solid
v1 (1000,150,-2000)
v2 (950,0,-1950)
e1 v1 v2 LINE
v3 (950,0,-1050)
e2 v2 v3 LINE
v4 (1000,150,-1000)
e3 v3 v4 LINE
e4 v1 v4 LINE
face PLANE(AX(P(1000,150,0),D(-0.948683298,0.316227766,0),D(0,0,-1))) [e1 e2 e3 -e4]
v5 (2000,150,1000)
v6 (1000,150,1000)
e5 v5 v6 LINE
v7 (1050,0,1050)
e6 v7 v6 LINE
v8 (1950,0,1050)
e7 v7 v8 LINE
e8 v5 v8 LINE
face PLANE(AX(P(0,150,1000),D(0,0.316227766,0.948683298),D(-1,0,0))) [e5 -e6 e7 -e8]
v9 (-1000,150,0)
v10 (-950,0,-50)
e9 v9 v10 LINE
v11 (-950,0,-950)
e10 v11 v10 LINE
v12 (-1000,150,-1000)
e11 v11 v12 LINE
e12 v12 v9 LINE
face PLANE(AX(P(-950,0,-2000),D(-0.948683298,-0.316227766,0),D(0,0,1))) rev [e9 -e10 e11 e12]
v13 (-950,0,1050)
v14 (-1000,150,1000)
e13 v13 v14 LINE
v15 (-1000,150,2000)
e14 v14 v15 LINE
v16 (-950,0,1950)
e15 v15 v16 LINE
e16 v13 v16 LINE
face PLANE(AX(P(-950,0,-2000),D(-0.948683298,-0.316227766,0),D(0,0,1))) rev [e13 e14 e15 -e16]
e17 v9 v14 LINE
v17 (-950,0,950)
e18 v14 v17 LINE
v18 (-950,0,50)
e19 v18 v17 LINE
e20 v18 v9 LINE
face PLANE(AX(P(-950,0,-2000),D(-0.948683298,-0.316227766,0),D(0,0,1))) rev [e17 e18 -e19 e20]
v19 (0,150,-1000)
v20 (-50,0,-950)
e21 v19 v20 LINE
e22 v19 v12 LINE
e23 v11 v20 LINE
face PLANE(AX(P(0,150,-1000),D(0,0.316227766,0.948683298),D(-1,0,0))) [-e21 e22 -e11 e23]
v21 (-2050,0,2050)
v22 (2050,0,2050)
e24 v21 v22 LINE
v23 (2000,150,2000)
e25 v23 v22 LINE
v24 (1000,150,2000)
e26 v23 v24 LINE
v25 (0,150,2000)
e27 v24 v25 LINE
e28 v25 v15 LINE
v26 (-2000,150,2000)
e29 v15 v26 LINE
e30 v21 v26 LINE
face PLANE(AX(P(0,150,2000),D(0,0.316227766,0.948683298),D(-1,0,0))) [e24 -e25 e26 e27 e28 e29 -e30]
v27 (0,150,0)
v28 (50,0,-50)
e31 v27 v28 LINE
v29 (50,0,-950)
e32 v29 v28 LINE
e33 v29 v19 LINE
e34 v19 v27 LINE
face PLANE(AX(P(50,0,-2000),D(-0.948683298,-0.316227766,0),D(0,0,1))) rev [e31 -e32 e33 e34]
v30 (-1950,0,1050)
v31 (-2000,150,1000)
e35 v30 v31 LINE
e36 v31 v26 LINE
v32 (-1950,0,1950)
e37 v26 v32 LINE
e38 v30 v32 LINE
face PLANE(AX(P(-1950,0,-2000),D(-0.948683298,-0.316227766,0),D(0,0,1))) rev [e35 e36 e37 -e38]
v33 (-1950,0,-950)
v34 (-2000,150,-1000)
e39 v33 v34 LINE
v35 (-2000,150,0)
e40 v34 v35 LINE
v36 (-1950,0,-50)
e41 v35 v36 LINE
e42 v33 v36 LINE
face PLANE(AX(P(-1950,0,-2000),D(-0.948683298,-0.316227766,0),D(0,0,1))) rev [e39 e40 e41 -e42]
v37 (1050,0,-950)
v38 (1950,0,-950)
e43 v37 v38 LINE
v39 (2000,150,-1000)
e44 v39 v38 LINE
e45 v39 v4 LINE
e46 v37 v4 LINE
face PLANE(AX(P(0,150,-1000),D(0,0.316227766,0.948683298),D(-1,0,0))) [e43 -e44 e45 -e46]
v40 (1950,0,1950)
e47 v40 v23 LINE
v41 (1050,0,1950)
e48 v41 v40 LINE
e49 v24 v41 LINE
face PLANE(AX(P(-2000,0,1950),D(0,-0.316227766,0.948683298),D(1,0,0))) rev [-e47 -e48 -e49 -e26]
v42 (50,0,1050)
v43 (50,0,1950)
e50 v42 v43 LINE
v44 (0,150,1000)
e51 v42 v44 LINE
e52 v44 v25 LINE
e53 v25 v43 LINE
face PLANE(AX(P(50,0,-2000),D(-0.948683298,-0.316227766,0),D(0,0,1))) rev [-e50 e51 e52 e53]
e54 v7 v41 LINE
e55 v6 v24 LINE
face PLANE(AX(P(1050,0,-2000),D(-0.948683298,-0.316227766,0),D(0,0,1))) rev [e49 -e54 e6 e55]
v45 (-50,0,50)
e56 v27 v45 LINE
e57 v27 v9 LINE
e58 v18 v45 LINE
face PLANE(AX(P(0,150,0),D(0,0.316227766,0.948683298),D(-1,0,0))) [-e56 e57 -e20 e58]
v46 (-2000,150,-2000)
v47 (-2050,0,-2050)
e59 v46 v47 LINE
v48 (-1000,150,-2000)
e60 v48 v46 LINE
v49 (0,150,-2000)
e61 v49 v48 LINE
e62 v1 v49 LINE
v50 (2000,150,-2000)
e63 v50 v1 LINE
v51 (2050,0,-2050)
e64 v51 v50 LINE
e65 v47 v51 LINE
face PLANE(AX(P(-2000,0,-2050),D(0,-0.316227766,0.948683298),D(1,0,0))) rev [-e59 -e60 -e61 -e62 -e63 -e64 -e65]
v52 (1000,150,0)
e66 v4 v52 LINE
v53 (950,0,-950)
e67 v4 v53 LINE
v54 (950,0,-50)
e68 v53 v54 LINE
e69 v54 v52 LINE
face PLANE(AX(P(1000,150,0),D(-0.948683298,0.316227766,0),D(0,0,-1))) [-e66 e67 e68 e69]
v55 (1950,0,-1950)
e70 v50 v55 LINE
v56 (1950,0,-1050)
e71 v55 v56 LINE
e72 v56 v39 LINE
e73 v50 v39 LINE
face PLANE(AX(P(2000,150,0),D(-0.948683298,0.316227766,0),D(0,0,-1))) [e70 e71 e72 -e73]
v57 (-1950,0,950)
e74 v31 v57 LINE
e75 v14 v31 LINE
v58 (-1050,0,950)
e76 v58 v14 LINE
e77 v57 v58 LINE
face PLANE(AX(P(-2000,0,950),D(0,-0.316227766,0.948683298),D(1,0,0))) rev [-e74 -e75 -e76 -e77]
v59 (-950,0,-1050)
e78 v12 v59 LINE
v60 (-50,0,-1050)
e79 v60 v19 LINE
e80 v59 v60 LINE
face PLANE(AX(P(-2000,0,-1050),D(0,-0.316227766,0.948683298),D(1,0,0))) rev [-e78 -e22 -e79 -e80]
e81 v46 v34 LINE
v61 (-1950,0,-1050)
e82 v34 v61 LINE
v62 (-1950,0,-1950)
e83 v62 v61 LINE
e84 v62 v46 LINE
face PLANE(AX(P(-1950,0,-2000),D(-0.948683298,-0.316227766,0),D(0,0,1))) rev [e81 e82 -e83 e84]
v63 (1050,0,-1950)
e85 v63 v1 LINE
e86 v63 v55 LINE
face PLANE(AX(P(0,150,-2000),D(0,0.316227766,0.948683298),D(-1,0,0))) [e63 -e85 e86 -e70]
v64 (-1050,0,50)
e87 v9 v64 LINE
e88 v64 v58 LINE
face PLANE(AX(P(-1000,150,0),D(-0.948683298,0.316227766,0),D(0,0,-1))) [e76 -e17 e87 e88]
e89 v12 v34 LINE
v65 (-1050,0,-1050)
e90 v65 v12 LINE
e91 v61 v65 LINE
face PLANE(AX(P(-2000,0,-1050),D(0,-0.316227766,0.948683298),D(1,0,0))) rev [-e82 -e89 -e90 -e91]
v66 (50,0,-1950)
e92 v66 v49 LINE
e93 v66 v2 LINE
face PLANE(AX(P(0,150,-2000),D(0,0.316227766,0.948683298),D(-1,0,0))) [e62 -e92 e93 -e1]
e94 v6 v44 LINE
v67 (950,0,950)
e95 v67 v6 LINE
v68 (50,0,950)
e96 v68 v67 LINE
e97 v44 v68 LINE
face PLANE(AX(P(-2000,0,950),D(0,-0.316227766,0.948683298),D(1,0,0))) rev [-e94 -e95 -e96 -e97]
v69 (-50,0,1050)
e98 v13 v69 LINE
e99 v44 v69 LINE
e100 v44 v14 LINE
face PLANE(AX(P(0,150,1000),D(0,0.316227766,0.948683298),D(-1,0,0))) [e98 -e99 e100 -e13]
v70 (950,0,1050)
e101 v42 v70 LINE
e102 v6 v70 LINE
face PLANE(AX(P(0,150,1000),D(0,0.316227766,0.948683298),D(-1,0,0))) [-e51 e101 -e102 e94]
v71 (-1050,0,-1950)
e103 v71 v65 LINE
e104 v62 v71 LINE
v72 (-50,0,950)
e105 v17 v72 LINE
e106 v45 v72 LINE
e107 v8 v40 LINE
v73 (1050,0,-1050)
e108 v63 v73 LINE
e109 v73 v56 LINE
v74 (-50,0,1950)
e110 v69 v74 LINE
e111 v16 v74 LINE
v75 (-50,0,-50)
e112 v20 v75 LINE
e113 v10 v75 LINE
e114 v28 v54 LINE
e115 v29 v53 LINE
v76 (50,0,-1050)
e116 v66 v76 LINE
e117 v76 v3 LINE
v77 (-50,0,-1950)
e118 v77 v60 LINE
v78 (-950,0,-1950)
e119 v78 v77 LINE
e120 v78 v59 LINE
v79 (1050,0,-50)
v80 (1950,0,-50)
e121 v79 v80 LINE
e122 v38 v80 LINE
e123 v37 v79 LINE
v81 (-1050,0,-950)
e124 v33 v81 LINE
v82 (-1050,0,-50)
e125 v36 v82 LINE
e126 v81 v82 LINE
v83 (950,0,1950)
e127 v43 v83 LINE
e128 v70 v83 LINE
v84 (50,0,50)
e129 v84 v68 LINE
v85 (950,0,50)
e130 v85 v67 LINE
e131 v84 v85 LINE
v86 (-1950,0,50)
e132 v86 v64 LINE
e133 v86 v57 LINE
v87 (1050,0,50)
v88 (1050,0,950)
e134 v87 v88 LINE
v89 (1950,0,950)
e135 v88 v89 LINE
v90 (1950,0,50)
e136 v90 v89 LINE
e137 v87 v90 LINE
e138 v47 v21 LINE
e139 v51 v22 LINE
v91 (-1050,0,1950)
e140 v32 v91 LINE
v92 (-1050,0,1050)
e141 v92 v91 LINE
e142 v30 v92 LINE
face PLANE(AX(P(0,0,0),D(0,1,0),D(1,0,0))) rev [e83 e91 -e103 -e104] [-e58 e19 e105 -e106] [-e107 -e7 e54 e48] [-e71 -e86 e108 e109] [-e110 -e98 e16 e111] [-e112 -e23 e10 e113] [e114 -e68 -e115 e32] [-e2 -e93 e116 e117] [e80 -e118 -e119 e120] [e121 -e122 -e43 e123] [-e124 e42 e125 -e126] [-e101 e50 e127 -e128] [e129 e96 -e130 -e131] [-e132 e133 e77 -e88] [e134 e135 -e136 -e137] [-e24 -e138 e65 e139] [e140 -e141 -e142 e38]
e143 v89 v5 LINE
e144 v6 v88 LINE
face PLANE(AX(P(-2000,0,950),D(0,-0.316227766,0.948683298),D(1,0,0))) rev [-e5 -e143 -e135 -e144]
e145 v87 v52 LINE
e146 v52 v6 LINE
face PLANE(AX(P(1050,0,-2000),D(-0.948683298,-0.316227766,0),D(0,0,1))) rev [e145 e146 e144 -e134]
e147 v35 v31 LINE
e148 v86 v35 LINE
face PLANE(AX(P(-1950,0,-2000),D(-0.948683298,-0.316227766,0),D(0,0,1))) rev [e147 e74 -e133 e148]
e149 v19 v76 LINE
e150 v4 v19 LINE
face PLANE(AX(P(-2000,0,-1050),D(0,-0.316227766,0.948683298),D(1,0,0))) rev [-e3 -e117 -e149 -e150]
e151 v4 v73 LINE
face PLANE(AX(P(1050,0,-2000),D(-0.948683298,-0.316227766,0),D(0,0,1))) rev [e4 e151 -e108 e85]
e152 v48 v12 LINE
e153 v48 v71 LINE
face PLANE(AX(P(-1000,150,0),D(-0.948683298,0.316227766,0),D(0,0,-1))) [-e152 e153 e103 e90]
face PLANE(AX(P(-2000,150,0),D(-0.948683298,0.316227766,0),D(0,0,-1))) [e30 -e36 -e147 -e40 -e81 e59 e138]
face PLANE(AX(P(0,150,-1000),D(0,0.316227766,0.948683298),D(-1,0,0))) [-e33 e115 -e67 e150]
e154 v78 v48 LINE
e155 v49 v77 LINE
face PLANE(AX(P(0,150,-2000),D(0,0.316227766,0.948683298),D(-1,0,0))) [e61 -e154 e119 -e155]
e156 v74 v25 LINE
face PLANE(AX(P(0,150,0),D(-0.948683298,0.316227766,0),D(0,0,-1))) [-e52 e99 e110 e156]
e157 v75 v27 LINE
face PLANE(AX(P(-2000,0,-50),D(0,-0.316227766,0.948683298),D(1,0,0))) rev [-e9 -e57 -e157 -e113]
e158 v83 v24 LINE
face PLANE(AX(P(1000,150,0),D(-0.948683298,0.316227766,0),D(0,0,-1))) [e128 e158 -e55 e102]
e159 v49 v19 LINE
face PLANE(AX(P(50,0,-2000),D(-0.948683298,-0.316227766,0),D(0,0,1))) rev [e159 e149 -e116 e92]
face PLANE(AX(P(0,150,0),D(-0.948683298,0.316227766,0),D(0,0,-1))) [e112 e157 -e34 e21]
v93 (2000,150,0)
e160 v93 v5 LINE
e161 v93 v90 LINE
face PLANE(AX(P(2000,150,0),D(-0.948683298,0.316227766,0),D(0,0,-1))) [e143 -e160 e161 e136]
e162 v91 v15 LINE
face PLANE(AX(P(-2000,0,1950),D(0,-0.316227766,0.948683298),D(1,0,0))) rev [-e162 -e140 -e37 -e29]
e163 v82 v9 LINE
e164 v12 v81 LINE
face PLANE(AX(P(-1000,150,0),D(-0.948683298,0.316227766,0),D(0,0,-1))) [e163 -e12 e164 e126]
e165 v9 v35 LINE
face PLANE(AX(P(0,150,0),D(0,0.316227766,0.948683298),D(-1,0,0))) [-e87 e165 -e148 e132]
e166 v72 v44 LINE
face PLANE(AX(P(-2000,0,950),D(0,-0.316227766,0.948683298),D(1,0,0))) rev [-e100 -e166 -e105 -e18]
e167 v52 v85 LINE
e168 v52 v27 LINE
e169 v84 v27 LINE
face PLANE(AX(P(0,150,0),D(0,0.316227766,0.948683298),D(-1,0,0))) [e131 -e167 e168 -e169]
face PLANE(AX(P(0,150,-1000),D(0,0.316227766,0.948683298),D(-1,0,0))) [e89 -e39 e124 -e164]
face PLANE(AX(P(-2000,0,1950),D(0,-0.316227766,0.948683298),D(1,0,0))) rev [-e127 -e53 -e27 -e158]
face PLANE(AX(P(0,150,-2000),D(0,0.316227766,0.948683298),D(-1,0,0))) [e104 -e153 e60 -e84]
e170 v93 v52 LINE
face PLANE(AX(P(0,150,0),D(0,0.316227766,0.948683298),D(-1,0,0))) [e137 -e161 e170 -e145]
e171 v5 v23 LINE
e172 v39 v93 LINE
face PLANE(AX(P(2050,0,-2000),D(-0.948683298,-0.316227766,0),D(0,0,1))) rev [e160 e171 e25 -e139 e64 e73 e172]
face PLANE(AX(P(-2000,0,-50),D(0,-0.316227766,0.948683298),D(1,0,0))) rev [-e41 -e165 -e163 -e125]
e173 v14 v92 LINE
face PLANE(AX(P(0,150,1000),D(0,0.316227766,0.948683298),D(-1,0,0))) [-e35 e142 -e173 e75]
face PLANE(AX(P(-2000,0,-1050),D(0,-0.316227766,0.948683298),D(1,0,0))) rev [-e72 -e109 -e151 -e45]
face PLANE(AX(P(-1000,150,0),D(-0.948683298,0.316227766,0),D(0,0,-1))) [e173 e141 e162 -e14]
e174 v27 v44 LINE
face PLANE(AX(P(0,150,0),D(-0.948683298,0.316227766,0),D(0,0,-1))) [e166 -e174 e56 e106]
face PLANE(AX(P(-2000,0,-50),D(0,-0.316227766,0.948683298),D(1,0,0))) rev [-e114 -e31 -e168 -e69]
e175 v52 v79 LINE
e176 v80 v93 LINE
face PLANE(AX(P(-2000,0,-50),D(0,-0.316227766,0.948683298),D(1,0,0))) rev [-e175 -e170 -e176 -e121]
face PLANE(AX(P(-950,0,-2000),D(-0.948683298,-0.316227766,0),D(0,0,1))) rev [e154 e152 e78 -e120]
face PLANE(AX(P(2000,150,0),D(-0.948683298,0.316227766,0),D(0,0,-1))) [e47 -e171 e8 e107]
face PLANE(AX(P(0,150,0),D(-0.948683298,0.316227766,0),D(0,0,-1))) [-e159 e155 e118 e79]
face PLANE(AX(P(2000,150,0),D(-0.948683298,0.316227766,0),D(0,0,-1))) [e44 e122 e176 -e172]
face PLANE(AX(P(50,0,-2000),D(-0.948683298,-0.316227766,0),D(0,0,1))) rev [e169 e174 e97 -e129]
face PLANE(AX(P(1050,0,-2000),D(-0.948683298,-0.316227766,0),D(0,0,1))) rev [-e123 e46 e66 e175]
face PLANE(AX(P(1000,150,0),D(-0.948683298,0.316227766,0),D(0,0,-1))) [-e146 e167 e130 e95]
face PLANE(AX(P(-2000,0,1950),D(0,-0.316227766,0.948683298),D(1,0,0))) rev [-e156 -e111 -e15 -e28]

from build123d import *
from OCP.BRepFilletAPI import BRepFilletAPI_MakeChamfer

# Parameters (mm, degrees)
SKETCH_1_W       = 4000
SKETCH_1_H       = 100
SKETCH_1_W_2     = 4100
SKETCH_1_H_2     = 4100
SKETCH_1_W_3     = 3900
SKETCH_1_H_3     = 3900
SKETCH_1_W_4     = 100
SKETCH_1_H_4     = 4000
EXTRUDE_1_DEPTH  = 150
CHAMFER_1_SIZE   = 150
CHAMFER_1_SIZE_2 = 50
CHAMFER_2_SIZE   = 50
CHAMFER_2_SIZE_2 = 150
CHAMFER_3_SIZE   = 150
CHAMFER_3_SIZE_2 = 50
CHAMFER_4_SIZE   = 150
CHAMFER_4_SIZE_2 = 50


with BuildPart() as part:
    # 草图1 → 拉伸-薄壁1 (new body)
    # profile 1 of 7: a face of its own
    with BuildSketch(Plane(origin=(0, 0, 0), x_dir=(1, 0, 0), z_dir=(0, 1, 0))):
        Rectangle(SKETCH_1_W, SKETCH_1_H)
    # profile 2 of 7: a face of its own
    with BuildSketch(Plane(origin=(0, 0, 0), x_dir=(1, 0, 0), z_dir=(0, 1, 0))):
        Rectangle(SKETCH_1_W_2, SKETCH_1_H_2)
        Rectangle(SKETCH_1_W_3, SKETCH_1_H_3, mode=Mode.SUBTRACT)
    # profile 3 of 7: a face of its own
    with BuildSketch(Plane(origin=(0, 0, 0), x_dir=(1, 0, 0), z_dir=(0, 1, 0))):
        Rectangle(SKETCH_1_W_4, SKETCH_1_H_4)
    # profile 4 of 7: a face of its own
    with BuildSketch(Plane(origin=(0, 0, 0), x_dir=(1, 0, 0), z_dir=(0, 1, 0))):
        with Locations((0, 1000)):
            Rectangle(SKETCH_1_W, SKETCH_1_H)
    # profile 5 of 7: a face of its own
    with BuildSketch(Plane(origin=(0, 0, 0), x_dir=(1, 0, 0), z_dir=(0, 1, 0))):
        with Locations((0, -1000)):
            Rectangle(SKETCH_1_W, SKETCH_1_H)
    # profile 6 of 7: a face of its own
    with BuildSketch(Plane(origin=(0, 0, 0), x_dir=(1, 0, 0), z_dir=(0, 1, 0))):
        with Locations((-1000, 0)):
            Rectangle(SKETCH_1_W_4, SKETCH_1_H_4)
    # profile 7 of 7: a face of its own
    with BuildSketch(Plane(origin=(0, 0, 0), x_dir=(1, 0, 0), z_dir=(0, 1, 0))):
        with Locations((1000, 0)):
            Rectangle(SKETCH_1_W_4, SKETCH_1_H_4)
    extrude(amount=EXTRUDE_1_DEPTH)

    # 倒角1
    chamfer_1_edges_1 = [part.edges().sort_by_distance(p)[0] for p in [
        (1950, 150, -1500),
    ]]
    chamfer_1_side_1 = [part.faces().sort_by_distance(p)[0] for p in [
        (1950, 149, -1500),
    ]]
    chamfer_1_edges_2 = [part.edges().sort_by_distance(p)[0] for p in [
        (1950, 150, -500),
    ]]
    chamfer_1_side_2 = [part.faces().sort_by_distance(p)[0] for p in [
        (1950, 149, -500),
    ]]
    chamfer_1_edges_3 = [part.edges().sort_by_distance(p)[0] for p in [
        (1950, 150, 500),
    ]]
    chamfer_1_side_3 = [part.faces().sort_by_distance(p)[0] for p in [
        (1950, 149, 500),
    ]]
    chamfer_1_edges_4 = [part.edges().sort_by_distance(p)[0] for p in [
        (1950, 150, 1500),
    ]]
    chamfer_1_side_4 = [part.faces().sort_by_distance(p)[0] for p in [
        (1950, 149, 1500),
    ]]
    chamfer_1_edges_5 = [part.edges().sort_by_distance(p)[0] for p in [
        (950, 150, 1500),
    ]]
    chamfer_1_side_5 = [part.faces().sort_by_distance(p)[0] for p in [
        (951, 150, 1500),
    ]]
    chamfer_1_edges_6 = [part.edges().sort_by_distance(p)[0] for p in [
        (950, 150, 500),
    ]]
    chamfer_1_side_6 = [part.faces().sort_by_distance(p)[0] for p in [
        (951, 150, 500),
    ]]
    chamfer_1_edges_7 = [part.edges().sort_by_distance(p)[0] for p in [
        (950, 150, -500),
    ]]
    chamfer_1_side_7 = [part.faces().sort_by_distance(p)[0] for p in [
        (951, 150, -500),
    ]]
    chamfer_1_edges_8 = [part.edges().sort_by_distance(p)[0] for p in [
        (950, 150, -1500),
    ]]
    chamfer_1_side_8 = [part.faces().sort_by_distance(p)[0] for p in [
        (951, 150, -1500),
    ]]
    chamfer_1_edges_9 = [part.edges().sort_by_distance(p)[0] for p in [
        (-50, 150, -1500),
    ]]
    chamfer_1_side_9 = [part.faces().sort_by_distance(p)[0] for p in [
        (-50, 149, -1500),
    ]]
    chamfer_1_edges_10 = [part.edges().sort_by_distance(p)[0] for p in [
        (-50, 150, -500),
    ]]
    chamfer_1_side_10 = [part.faces().sort_by_distance(p)[0] for p in [
        (-50, 149, -500),
    ]]
    chamfer_1_edges_11 = [part.edges().sort_by_distance(p)[0] for p in [
        (-50, 150, 500),
    ]]
    chamfer_1_side_11 = [part.faces().sort_by_distance(p)[0] for p in [
        (-50, 149, 500),
    ]]
    chamfer_1_edges_12 = [part.edges().sort_by_distance(p)[0] for p in [
        (-50, 150, 1500),
    ]]
    chamfer_1_side_12 = [part.faces().sort_by_distance(p)[0] for p in [
        (-50, 149, 1500),
    ]]
    chamfer_1_edges_13 = [part.edges().sort_by_distance(p)[0] for p in [
        (-1050, 150, 1500),
    ]]
    chamfer_1_side_13 = [part.faces().sort_by_distance(p)[0] for p in [
        (-1050, 149, 1500),
    ]]
    chamfer_1_edges_14 = [part.edges().sort_by_distance(p)[0] for p in [
        (-1050, 150, 500),
    ]]
    chamfer_1_side_14 = [part.faces().sort_by_distance(p)[0] for p in [
        (-1050, 149, 500),
    ]]
    chamfer_1_edges_15 = [part.edges().sort_by_distance(p)[0] for p in [
        (-1050, 150, -500),
    ]]
    chamfer_1_side_15 = [part.faces().sort_by_distance(p)[0] for p in [
        (-1050, 149, -500),
    ]]
    chamfer_1_edges_16 = [part.edges().sort_by_distance(p)[0] for p in [
        (-1050, 150, -1500),
    ]]
    chamfer_1_side_16 = [part.faces().sort_by_distance(p)[0] for p in [
        (-1050, 149, -1500),
    ]]
    chamfer_1_edges_17 = [part.edges().sort_by_distance(p)[0] for p in [
        (-2050, 150, 0),
    ]]
    chamfer_1_side_17 = [part.faces().sort_by_distance(p)[0] for p in [
        (-2050, 149, 0),
    ]]
    chamfer_1 = BRepFilletAPI_MakeChamfer(part.part.solid().wrapped)
    for e in chamfer_1_edges_1:
        chamfer_1.Add(CHAMFER_1_SIZE - 0.0001, CHAMFER_1_SIZE_2 - 0.0001, e.wrapped, chamfer_1_side_1[0].wrapped)
    for e in chamfer_1_edges_2:
        chamfer_1.Add(CHAMFER_1_SIZE - 0.0001, CHAMFER_1_SIZE_2 - 0.0001, e.wrapped, chamfer_1_side_2[0].wrapped)
    for e in chamfer_1_edges_3:
        chamfer_1.Add(CHAMFER_1_SIZE - 0.0001, CHAMFER_1_SIZE_2 - 0.0001, e.wrapped, chamfer_1_side_3[0].wrapped)
    for e in chamfer_1_edges_4:
        chamfer_1.Add(CHAMFER_1_SIZE - 0.0001, CHAMFER_1_SIZE_2 - 0.0001, e.wrapped, chamfer_1_side_4[0].wrapped)
    for e in chamfer_1_edges_5:
        chamfer_1.Add(CHAMFER_1_SIZE_2 - 0.0001, CHAMFER_1_SIZE - 0.0001, e.wrapped, chamfer_1_side_5[0].wrapped)
    for e in chamfer_1_edges_6:
        chamfer_1.Add(CHAMFER_1_SIZE_2 - 0.0001, CHAMFER_1_SIZE - 0.0001, e.wrapped, chamfer_1_side_6[0].wrapped)
    for e in chamfer_1_edges_7:
        chamfer_1.Add(CHAMFER_1_SIZE_2 - 0.0001, CHAMFER_1_SIZE - 0.0001, e.wrapped, chamfer_1_side_7[0].wrapped)
    for e in chamfer_1_edges_8:
        chamfer_1.Add(CHAMFER_1_SIZE_2 - 0.0001, CHAMFER_1_SIZE - 0.0001, e.wrapped, chamfer_1_side_8[0].wrapped)
    for e in chamfer_1_edges_9:
        chamfer_1.Add(CHAMFER_1_SIZE - 0.0001, CHAMFER_1_SIZE_2 - 0.0001, e.wrapped, chamfer_1_side_9[0].wrapped)
    for e in chamfer_1_edges_10:
        chamfer_1.Add(CHAMFER_1_SIZE - 0.0001, CHAMFER_1_SIZE_2 - 0.0001, e.wrapped, chamfer_1_side_10[0].wrapped)
    for e in chamfer_1_edges_11:
        chamfer_1.Add(CHAMFER_1_SIZE - 0.0001, CHAMFER_1_SIZE_2 - 0.0001, e.wrapped, chamfer_1_side_11[0].wrapped)
    for e in chamfer_1_edges_12:
        chamfer_1.Add(CHAMFER_1_SIZE - 0.0001, CHAMFER_1_SIZE_2 - 0.0001, e.wrapped, chamfer_1_side_12[0].wrapped)
    for e in chamfer_1_edges_13:
        chamfer_1.Add(CHAMFER_1_SIZE - 0.0001, CHAMFER_1_SIZE_2 - 0.0001, e.wrapped, chamfer_1_side_13[0].wrapped)
    for e in chamfer_1_edges_14:
        chamfer_1.Add(CHAMFER_1_SIZE - 0.0001, CHAMFER_1_SIZE_2 - 0.0001, e.wrapped, chamfer_1_side_14[0].wrapped)
    for e in chamfer_1_edges_15:
        chamfer_1.Add(CHAMFER_1_SIZE - 0.0001, CHAMFER_1_SIZE_2 - 0.0001, e.wrapped, chamfer_1_side_15[0].wrapped)
    for e in chamfer_1_edges_16:
        chamfer_1.Add(CHAMFER_1_SIZE - 0.0001, CHAMFER_1_SIZE_2 - 0.0001, e.wrapped, chamfer_1_side_16[0].wrapped)
    for e in chamfer_1_edges_17:
        chamfer_1.Add(CHAMFER_1_SIZE - 0.0001, CHAMFER_1_SIZE_2 - 0.0001, e.wrapped, chamfer_1_side_17[0].wrapped)
    add(Compound.cast(chamfer_1.Shape()), mode=Mode.REPLACE)  # a hair under: the kernel refuses the full size

    # 倒角2
    chamfer_2_edges_1 = [part.edges().sort_by_distance(p)[0] for p in [
        (-1950, 150, -1500),
    ]]
    chamfer_2_side_1 = [part.faces().sort_by_distance(p)[0] for p in [
        (-1951, 150, -1500),
    ]]
    chamfer_2_edges_2 = [part.edges().sort_by_distance(p)[0] for p in [
        (-1950, 150, -500),
    ]]
    chamfer_2_side_2 = [part.faces().sort_by_distance(p)[0] for p in [
        (-1951, 150, -500),
    ]]
    chamfer_2_edges_3 = [part.edges().sort_by_distance(p)[0] for p in [
        (-1950, 150, 500),
    ]]
    chamfer_2_side_3 = [part.faces().sort_by_distance(p)[0] for p in [
        (-1951, 150, 500),
    ]]
    chamfer_2_edges_4 = [part.edges().sort_by_distance(p)[0] for p in [
        (-1950, 150, 1500),
    ]]
    chamfer_2_side_4 = [part.faces().sort_by_distance(p)[0] for p in [
        (-1951, 150, 1500),
    ]]
    chamfer_2_edges_5 = [part.edges().sort_by_distance(p)[0] for p in [
        (-950, 150, 1500),
    ]]
    chamfer_2_side_5 = [part.faces().sort_by_distance(p)[0] for p in [
        (-951, 150, 1500),
    ]]
    chamfer_2_edges_6 = [part.edges().sort_by_distance(p)[0] for p in [
        (-950, 150, 500),
    ]]
    chamfer_2_side_6 = [part.faces().sort_by_distance(p)[0] for p in [
        (-951, 150, 500),
    ]]
    chamfer_2_edges_7 = [part.edges().sort_by_distance(p)[0] for p in [
        (-950, 150, -500),
    ]]
    chamfer_2_side_7 = [part.faces().sort_by_distance(p)[0] for p in [
        (-951, 150, -500),
    ]]
    chamfer_2_edges_8 = [part.edges().sort_by_distance(p)[0] for p in [
        (-950, 150, -1500),
    ]]
    chamfer_2_side_8 = [part.faces().sort_by_distance(p)[0] for p in [
        (-951, 150, -1500),
    ]]
    chamfer_2_edges_9 = [part.edges().sort_by_distance(p)[0] for p in [
        (50, 150, -1500),
    ]]
    chamfer_2_side_9 = [part.faces().sort_by_distance(p)[0] for p in [
        (49, 150, -1500),
    ]]
    chamfer_2_edges_10 = [part.edges().sort_by_distance(p)[0] for p in [
        (50, 150, -500),
    ]]
    chamfer_2_side_10 = [part.faces().sort_by_distance(p)[0] for p in [
        (49, 150, -500),
    ]]
    chamfer_2_edges_11 = [part.edges().sort_by_distance(p)[0] for p in [
        (50, 150, 500),
    ]]
    chamfer_2_side_11 = [part.faces().sort_by_distance(p)[0] for p in [
        (49, 150, 500),
    ]]
    chamfer_2_edges_12 = [part.edges().sort_by_distance(p)[0] for p in [
        (50, 150, 1500),
    ]]
    chamfer_2_side_12 = [part.faces().sort_by_distance(p)[0] for p in [
        (49, 150, 1500),
    ]]
    chamfer_2_edges_13 = [part.edges().sort_by_distance(p)[0] for p in [
        (1050, 150, 1500),
    ]]
    chamfer_2_side_13 = [part.faces().sort_by_distance(p)[0] for p in [
        (1049, 150, 1500),
    ]]
    chamfer_2_edges_14 = [part.edges().sort_by_distance(p)[0] for p in [
        (1050, 150, 500),
    ]]
    chamfer_2_side_14 = [part.faces().sort_by_distance(p)[0] for p in [
        (1049, 150, 500),
    ]]
    chamfer_2_edges_15 = [part.edges().sort_by_distance(p)[0] for p in [
        (1050, 150, -500),
    ]]
    chamfer_2_side_15 = [part.faces().sort_by_distance(p)[0] for p in [
        (1049, 150, -500),
    ]]
    chamfer_2_edges_16 = [part.edges().sort_by_distance(p)[0] for p in [
        (1050, 150, -1500),
    ]]
    chamfer_2_side_16 = [part.faces().sort_by_distance(p)[0] for p in [
        (1049, 150, -1500),
    ]]
    chamfer_2_edges_17 = [part.edges().sort_by_distance(p)[0] for p in [
        (2050, 150, 0),
    ]]
    chamfer_2_side_17 = [part.faces().sort_by_distance(p)[0] for p in [
        (2050, 149, 0),
    ]]
    chamfer_2 = BRepFilletAPI_MakeChamfer(part.part.solid().wrapped)
    for e in chamfer_2_edges_1:
        chamfer_2.Add(CHAMFER_2_SIZE - 0.0001, CHAMFER_2_SIZE_2 - 0.0001, e.wrapped, chamfer_2_side_1[0].wrapped)
    for e in chamfer_2_edges_2:
        chamfer_2.Add(CHAMFER_2_SIZE - 0.0001, CHAMFER_2_SIZE_2 - 0.0001, e.wrapped, chamfer_2_side_2[0].wrapped)
    for e in chamfer_2_edges_3:
        chamfer_2.Add(CHAMFER_2_SIZE - 0.0001, CHAMFER_2_SIZE_2 - 0.0001, e.wrapped, chamfer_2_side_3[0].wrapped)
    for e in chamfer_2_edges_4:
        chamfer_2.Add(CHAMFER_2_SIZE - 0.0001, CHAMFER_2_SIZE_2 - 0.0001, e.wrapped, chamfer_2_side_4[0].wrapped)
    for e in chamfer_2_edges_5:
        chamfer_2.Add(CHAMFER_2_SIZE - 0.0001, CHAMFER_2_SIZE_2 - 0.0001, e.wrapped, chamfer_2_side_5[0].wrapped)
    for e in chamfer_2_edges_6:
        chamfer_2.Add(CHAMFER_2_SIZE - 0.0001, CHAMFER_2_SIZE_2 - 0.0001, e.wrapped, chamfer_2_side_6[0].wrapped)
    for e in chamfer_2_edges_7:
        chamfer_2.Add(CHAMFER_2_SIZE - 0.0001, CHAMFER_2_SIZE_2 - 0.0001, e.wrapped, chamfer_2_side_7[0].wrapped)
    for e in chamfer_2_edges_8:
        chamfer_2.Add(CHAMFER_2_SIZE - 0.0001, CHAMFER_2_SIZE_2 - 0.0001, e.wrapped, chamfer_2_side_8[0].wrapped)
    for e in chamfer_2_edges_9:
        chamfer_2.Add(CHAMFER_2_SIZE - 0.0001, CHAMFER_2_SIZE_2 - 0.0001, e.wrapped, chamfer_2_side_9[0].wrapped)
    for e in chamfer_2_edges_10:
        chamfer_2.Add(CHAMFER_2_SIZE - 0.0001, CHAMFER_2_SIZE_2 - 0.0001, e.wrapped, chamfer_2_side_10[0].wrapped)
    for e in chamfer_2_edges_11:
        chamfer_2.Add(CHAMFER_2_SIZE - 0.0001, CHAMFER_2_SIZE_2 - 0.0001, e.wrapped, chamfer_2_side_11[0].wrapped)
    for e in chamfer_2_edges_12:
        chamfer_2.Add(CHAMFER_2_SIZE - 0.0001, CHAMFER_2_SIZE_2 - 0.0001, e.wrapped, chamfer_2_side_12[0].wrapped)
    for e in chamfer_2_edges_13:
        chamfer_2.Add(CHAMFER_2_SIZE - 0.0001, CHAMFER_2_SIZE_2 - 0.0001, e.wrapped, chamfer_2_side_13[0].wrapped)
    for e in chamfer_2_edges_14:
        chamfer_2.Add(CHAMFER_2_SIZE - 0.0001, CHAMFER_2_SIZE_2 - 0.0001, e.wrapped, chamfer_2_side_14[0].wrapped)
    for e in chamfer_2_edges_15:
        chamfer_2.Add(CHAMFER_2_SIZE - 0.0001, CHAMFER_2_SIZE_2 - 0.0001, e.wrapped, chamfer_2_side_15[0].wrapped)
    for e in chamfer_2_edges_16:
        chamfer_2.Add(CHAMFER_2_SIZE - 0.0001, CHAMFER_2_SIZE_2 - 0.0001, e.wrapped, chamfer_2_side_16[0].wrapped)
    for e in chamfer_2_edges_17:
        chamfer_2.Add(CHAMFER_2_SIZE_2 - 0.0001, CHAMFER_2_SIZE - 0.0001, e.wrapped, chamfer_2_side_17[0].wrapped)
    add(Compound.cast(chamfer_2.Shape()), mode=Mode.REPLACE)  # a hair under: the kernel refuses the full size

    # 倒角3
    chamfer_3_edges_1 = [part.edges().sort_by_distance(p)[0] for p in [
        (-1500, 150, 1950),
    ]]
    chamfer_3_side_1 = [part.faces().sort_by_distance(p)[0] for p in [
        (-1500, 149, 1950),
    ]]
    chamfer_3_edges_2 = [part.edges().sort_by_distance(p)[0] for p in [
        (-500, 150, 1950),
    ]]
    chamfer_3_side_2 = [part.faces().sort_by_distance(p)[0] for p in [
        (-500, 149, 1950),
    ]]
    chamfer_3_edges_3 = [part.edges().sort_by_distance(p)[0] for p in [
        (500, 150, 1950),
    ]]
    chamfer_3_side_3 = [part.faces().sort_by_distance(p)[0] for p in [
        (500, 149, 1950),
    ]]
    chamfer_3_edges_4 = [part.edges().sort_by_distance(p)[0] for p in [
        (1500, 150, 1950),
    ]]
    chamfer_3_side_4 = [part.faces().sort_by_distance(p)[0] for p in [
        (1500, 149, 1950),
    ]]
    chamfer_3_edges_5 = [part.edges().sort_by_distance(p)[0] for p in [
        (1500, 150, 950),
    ]]
    chamfer_3_side_5 = [part.faces().sort_by_distance(p)[0] for p in [
        (1500, 149, 950),
    ]]
    chamfer_3_edges_6 = [part.edges().sort_by_distance(p)[0] for p in [
        (500, 150, 950),
    ]]
    chamfer_3_side_6 = [part.faces().sort_by_distance(p)[0] for p in [
        (500, 149, 950),
    ]]
    chamfer_3_edges_7 = [part.edges().sort_by_distance(p)[0] for p in [
        (-500, 150, 950),
    ]]
    chamfer_3_side_7 = [part.faces().sort_by_distance(p)[0] for p in [
        (-500, 149, 950),
    ]]
    chamfer_3_edges_8 = [part.edges().sort_by_distance(p)[0] for p in [
        (-1500, 150, 950),
    ]]
    chamfer_3_side_8 = [part.faces().sort_by_distance(p)[0] for p in [
        (-1500, 149, 950),
    ]]
    chamfer_3_edges_9 = [part.edges().sort_by_distance(p)[0] for p in [
        (1500, 150, -50),
    ]]
    chamfer_3_side_9 = [part.faces().sort_by_distance(p)[0] for p in [
        (1500, 149, -50),
    ]]
    chamfer_3_edges_10 = [part.edges().sort_by_distance(p)[0] for p in [
        (500, 150, -50),
    ]]
    chamfer_3_side_10 = [part.faces().sort_by_distance(p)[0] for p in [
        (500, 149, -50),
    ]]
    chamfer_3_edges_11 = [part.edges().sort_by_distance(p)[0] for p in [
        (-500, 150, -50),
    ]]
    chamfer_3_side_11 = [part.faces().sort_by_distance(p)[0] for p in [
        (-500, 149, -50),
    ]]
    chamfer_3_edges_12 = [part.edges().sort_by_distance(p)[0] for p in [
        (-1500, 150, -50),
    ]]
    chamfer_3_side_12 = [part.faces().sort_by_distance(p)[0] for p in [
        (-1500, 149, -50),
    ]]
    chamfer_3_edges_13 = [part.edges().sort_by_distance(p)[0] for p in [
        (1500, 150, -1050),
    ]]
    chamfer_3_side_13 = [part.faces().sort_by_distance(p)[0] for p in [
        (1500, 149, -1050),
    ]]
    chamfer_3_edges_14 = [part.edges().sort_by_distance(p)[0] for p in [
        (500, 150, -1050),
    ]]
    chamfer_3_side_14 = [part.faces().sort_by_distance(p)[0] for p in [
        (500, 149, -1050),
    ]]
    chamfer_3_edges_15 = [part.edges().sort_by_distance(p)[0] for p in [
        (-500, 150, -1050),
    ]]
    chamfer_3_side_15 = [part.faces().sort_by_distance(p)[0] for p in [
        (-500, 149, -1050),
    ]]
    chamfer_3_edges_16 = [part.edges().sort_by_distance(p)[0] for p in [
        (-1500, 150, -1050),
    ]]
    chamfer_3_side_16 = [part.faces().sort_by_distance(p)[0] for p in [
        (-1500, 149, -1050),
    ]]
    chamfer_3_edges_17 = [part.edges().sort_by_distance(p)[0] for p in [
        (0, 150, -2050),
    ]]
    chamfer_3_side_17 = [part.faces().sort_by_distance(p)[0] for p in [
        (0, 149, -2050),
    ]]
    chamfer_3 = BRepFilletAPI_MakeChamfer(part.part.solid().wrapped)
    for e in chamfer_3_edges_1:
        chamfer_3.Add(CHAMFER_3_SIZE - 0.0001, CHAMFER_3_SIZE_2 - 0.0001, e.wrapped, chamfer_3_side_1[0].wrapped)
    for e in chamfer_3_edges_2:
        chamfer_3.Add(CHAMFER_3_SIZE - 0.0001, CHAMFER_3_SIZE_2 - 0.0001, e.wrapped, chamfer_3_side_2[0].wrapped)
    for e in chamfer_3_edges_3:
        chamfer_3.Add(CHAMFER_3_SIZE - 0.0001, CHAMFER_3_SIZE_2 - 0.0001, e.wrapped, chamfer_3_side_3[0].wrapped)
    for e in chamfer_3_edges_4:
        chamfer_3.Add(CHAMFER_3_SIZE - 0.0001, CHAMFER_3_SIZE_2 - 0.0001, e.wrapped, chamfer_3_side_4[0].wrapped)
    for e in chamfer_3_edges_5:
        chamfer_3.Add(CHAMFER_3_SIZE - 0.0001, CHAMFER_3_SIZE_2 - 0.0001, e.wrapped, chamfer_3_side_5[0].wrapped)
    for e in chamfer_3_edges_6:
        chamfer_3.Add(CHAMFER_3_SIZE - 0.0001, CHAMFER_3_SIZE_2 - 0.0001, e.wrapped, chamfer_3_side_6[0].wrapped)
    for e in chamfer_3_edges_7:
        chamfer_3.Add(CHAMFER_3_SIZE - 0.0001, CHAMFER_3_SIZE_2 - 0.0001, e.wrapped, chamfer_3_side_7[0].wrapped)
    for e in chamfer_3_edges_8:
        chamfer_3.Add(CHAMFER_3_SIZE - 0.0001, CHAMFER_3_SIZE_2 - 0.0001, e.wrapped, chamfer_3_side_8[0].wrapped)
    for e in chamfer_3_edges_9:
        chamfer_3.Add(CHAMFER_3_SIZE - 0.0001, CHAMFER_3_SIZE_2 - 0.0001, e.wrapped, chamfer_3_side_9[0].wrapped)
    for e in chamfer_3_edges_10:
        chamfer_3.Add(CHAMFER_3_SIZE - 0.0001, CHAMFER_3_SIZE_2 - 0.0001, e.wrapped, chamfer_3_side_10[0].wrapped)
    for e in chamfer_3_edges_11:
        chamfer_3.Add(CHAMFER_3_SIZE - 0.0001, CHAMFER_3_SIZE_2 - 0.0001, e.wrapped, chamfer_3_side_11[0].wrapped)
    for e in chamfer_3_edges_12:
        chamfer_3.Add(CHAMFER_3_SIZE - 0.0001, CHAMFER_3_SIZE_2 - 0.0001, e.wrapped, chamfer_3_side_12[0].wrapped)
    for e in chamfer_3_edges_13:
        chamfer_3.Add(CHAMFER_3_SIZE - 0.0001, CHAMFER_3_SIZE_2 - 0.0001, e.wrapped, chamfer_3_side_13[0].wrapped)
    for e in chamfer_3_edges_14:
        chamfer_3.Add(CHAMFER_3_SIZE - 0.0001, CHAMFER_3_SIZE_2 - 0.0001, e.wrapped, chamfer_3_side_14[0].wrapped)
    for e in chamfer_3_edges_15:
        chamfer_3.Add(CHAMFER_3_SIZE - 0.0001, CHAMFER_3_SIZE_2 - 0.0001, e.wrapped, chamfer_3_side_15[0].wrapped)
    for e in chamfer_3_edges_16:
        chamfer_3.Add(CHAMFER_3_SIZE - 0.0001, CHAMFER_3_SIZE_2 - 0.0001, e.wrapped, chamfer_3_side_16[0].wrapped)
    for e in chamfer_3_edges_17:
        chamfer_3.Add(CHAMFER_3_SIZE - 0.0001, CHAMFER_3_SIZE_2 - 0.0001, e.wrapped, chamfer_3_side_17[0].wrapped)
    add(Compound.cast(chamfer_3.Shape()), mode=Mode.REPLACE)  # a hair under: the kernel refuses the full size

    # 倒角4
    chamfer_4_edges_1 = [part.edges().sort_by_distance(p)[0] for p in [
        (-1500, 150, 1050),
    ]]
    chamfer_4_side_1 = [part.faces().sort_by_distance(p)[0] for p in [
        (-1500, 149, 1050),
    ]]
    chamfer_4_edges_2 = [part.edges().sort_by_distance(p)[0] for p in [
        (-500, 150, 1050),
    ]]
    chamfer_4_side_2 = [part.faces().sort_by_distance(p)[0] for p in [
        (-500, 149, 1050),
    ]]
    chamfer_4_edges_3 = [part.edges().sort_by_distance(p)[0] for p in [
        (500, 150, 1050),
    ]]
    chamfer_4_side_3 = [part.faces().sort_by_distance(p)[0] for p in [
        (500, 149, 1050),
    ]]
    chamfer_4_edges_4 = [part.edges().sort_by_distance(p)[0] for p in [
        (1500, 150, 1050),
    ]]
    chamfer_4_side_4 = [part.faces().sort_by_distance(p)[0] for p in [
        (1500, 149, 1050),
    ]]
    chamfer_4_edges_5 = [part.edges().sort_by_distance(p)[0] for p in [
        (-1500, 150, 50),
    ]]
    chamfer_4_side_5 = [part.faces().sort_by_distance(p)[0] for p in [
        (-1500, 149, 50),
    ]]
    chamfer_4_edges_6 = [part.edges().sort_by_distance(p)[0] for p in [
        (-500, 150, 50),
    ]]
    chamfer_4_side_6 = [part.faces().sort_by_distance(p)[0] for p in [
        (-500, 149, 50),
    ]]
    chamfer_4_edges_7 = [part.edges().sort_by_distance(p)[0] for p in [
        (500, 150, 50),
    ]]
    chamfer_4_side_7 = [part.faces().sort_by_distance(p)[0] for p in [
        (500, 149, 50),
    ]]
    chamfer_4_edges_8 = [part.edges().sort_by_distance(p)[0] for p in [
        (1500, 150, 50),
    ]]
    chamfer_4_side_8 = [part.faces().sort_by_distance(p)[0] for p in [
        (1500, 149, 50),
    ]]
    chamfer_4_edges_9 = [part.edges().sort_by_distance(p)[0] for p in [
        (-1500, 150, -950),
    ]]
    chamfer_4_side_9 = [part.faces().sort_by_distance(p)[0] for p in [
        (-1500, 149, -950),
    ]]
    chamfer_4_edges_10 = [part.edges().sort_by_distance(p)[0] for p in [
        (-500, 150, -950),
    ]]
    chamfer_4_side_10 = [part.faces().sort_by_distance(p)[0] for p in [
        (-500, 149, -950),
    ]]
    chamfer_4_edges_11 = [part.edges().sort_by_distance(p)[0] for p in [
        (500, 150, -950),
    ]]
    chamfer_4_side_11 = [part.faces().sort_by_distance(p)[0] for p in [
        (500, 149, -950),
    ]]
    chamfer_4_edges_12 = [part.edges().sort_by_distance(p)[0] for p in [
        (1500, 150, -950),
    ]]
    chamfer_4_side_12 = [part.faces().sort_by_distance(p)[0] for p in [
        (1500, 149, -950),
    ]]
    chamfer_4_edges_13 = [part.edges().sort_by_distance(p)[0] for p in [
        (-1500, 150, -1950),
    ]]
    chamfer_4_side_13 = [part.faces().sort_by_distance(p)[0] for p in [
        (-1500, 149, -1950),
    ]]
    chamfer_4_edges_14 = [part.edges().sort_by_distance(p)[0] for p in [
        (-500, 150, -1950),
    ]]
    chamfer_4_side_14 = [part.faces().sort_by_distance(p)[0] for p in [
        (-500, 149, -1950),
    ]]
    chamfer_4_edges_15 = [part.edges().sort_by_distance(p)[0] for p in [
        (500, 150, -1950),
    ]]
    chamfer_4_side_15 = [part.faces().sort_by_distance(p)[0] for p in [
        (500, 149, -1950),
    ]]
    chamfer_4_edges_16 = [part.edges().sort_by_distance(p)[0] for p in [
        (1500, 150, -1950),
    ]]
    chamfer_4_side_16 = [part.faces().sort_by_distance(p)[0] for p in [
        (1500, 149, -1950),
    ]]
    chamfer_4_edges_17 = [part.edges().sort_by_distance(p)[0] for p in [
        (0, 150, 2050),
    ]]
    chamfer_4_side_17 = [part.faces().sort_by_distance(p)[0] for p in [
        (0, 149, 2050),
    ]]
    chamfer_4 = BRepFilletAPI_MakeChamfer(part.part.solid().wrapped)
    for e in chamfer_4_edges_1:
        chamfer_4.Add(CHAMFER_4_SIZE - 0.0001, CHAMFER_4_SIZE_2 - 0.0001, e.wrapped, chamfer_4_side_1[0].wrapped)
    for e in chamfer_4_edges_2:
        chamfer_4.Add(CHAMFER_4_SIZE - 0.0001, CHAMFER_4_SIZE_2 - 0.0001, e.wrapped, chamfer_4_side_2[0].wrapped)
    for e in chamfer_4_edges_3:
        chamfer_4.Add(CHAMFER_4_SIZE - 0.0001, CHAMFER_4_SIZE_2 - 0.0001, e.wrapped, chamfer_4_side_3[0].wrapped)
    for e in chamfer_4_edges_4:
        chamfer_4.Add(CHAMFER_4_SIZE - 0.0001, CHAMFER_4_SIZE_2 - 0.0001, e.wrapped, chamfer_4_side_4[0].wrapped)
    for e in chamfer_4_edges_5:
        chamfer_4.Add(CHAMFER_4_SIZE - 0.0001, CHAMFER_4_SIZE_2 - 0.0001, e.wrapped, chamfer_4_side_5[0].wrapped)
    for e in chamfer_4_edges_6:
        chamfer_4.Add(CHAMFER_4_SIZE - 0.0001, CHAMFER_4_SIZE_2 - 0.0001, e.wrapped, chamfer_4_side_6[0].wrapped)
    for e in chamfer_4_edges_7:
        chamfer_4.Add(CHAMFER_4_SIZE - 0.0001, CHAMFER_4_SIZE_2 - 0.0001, e.wrapped, chamfer_4_side_7[0].wrapped)
    for e in chamfer_4_edges_8:
        chamfer_4.Add(CHAMFER_4_SIZE - 0.0001, CHAMFER_4_SIZE_2 - 0.0001, e.wrapped, chamfer_4_side_8[0].wrapped)
    for e in chamfer_4_edges_9:
        chamfer_4.Add(CHAMFER_4_SIZE - 0.0001, CHAMFER_4_SIZE_2 - 0.0001, e.wrapped, chamfer_4_side_9[0].wrapped)
    for e in chamfer_4_edges_10:
        chamfer_4.Add(CHAMFER_4_SIZE - 0.0001, CHAMFER_4_SIZE_2 - 0.0001, e.wrapped, chamfer_4_side_10[0].wrapped)
    for e in chamfer_4_edges_11:
        chamfer_4.Add(CHAMFER_4_SIZE - 0.0001, CHAMFER_4_SIZE_2 - 0.0001, e.wrapped, chamfer_4_side_11[0].wrapped)
    for e in chamfer_4_edges_12:
        chamfer_4.Add(CHAMFER_4_SIZE - 0.0001, CHAMFER_4_SIZE_2 - 0.0001, e.wrapped, chamfer_4_side_12[0].wrapped)
    for e in chamfer_4_edges_13:
        chamfer_4.Add(CHAMFER_4_SIZE - 0.0001, CHAMFER_4_SIZE_2 - 0.0001, e.wrapped, chamfer_4_side_13[0].wrapped)
    for e in chamfer_4_edges_14:
        chamfer_4.Add(CHAMFER_4_SIZE - 0.0001, CHAMFER_4_SIZE_2 - 0.0001, e.wrapped, chamfer_4_side_14[0].wrapped)
    for e in chamfer_4_edges_15:
        chamfer_4.Add(CHAMFER_4_SIZE - 0.0001, CHAMFER_4_SIZE_2 - 0.0001, e.wrapped, chamfer_4_side_15[0].wrapped)
    for e in chamfer_4_edges_16:
        chamfer_4.Add(CHAMFER_4_SIZE - 0.0001, CHAMFER_4_SIZE_2 - 0.0001, e.wrapped, chamfer_4_side_16[0].wrapped)
    for e in chamfer_4_edges_17:
        chamfer_4.Add(CHAMFER_4_SIZE - 0.0001, CHAMFER_4_SIZE_2 - 0.0001, e.wrapped, chamfer_4_side_17[0].wrapped)
    add(Compound.cast(chamfer_4.Shape()), mode=Mode.REPLACE)  # a hair under: the kernel refuses the full size


solid = part.part
